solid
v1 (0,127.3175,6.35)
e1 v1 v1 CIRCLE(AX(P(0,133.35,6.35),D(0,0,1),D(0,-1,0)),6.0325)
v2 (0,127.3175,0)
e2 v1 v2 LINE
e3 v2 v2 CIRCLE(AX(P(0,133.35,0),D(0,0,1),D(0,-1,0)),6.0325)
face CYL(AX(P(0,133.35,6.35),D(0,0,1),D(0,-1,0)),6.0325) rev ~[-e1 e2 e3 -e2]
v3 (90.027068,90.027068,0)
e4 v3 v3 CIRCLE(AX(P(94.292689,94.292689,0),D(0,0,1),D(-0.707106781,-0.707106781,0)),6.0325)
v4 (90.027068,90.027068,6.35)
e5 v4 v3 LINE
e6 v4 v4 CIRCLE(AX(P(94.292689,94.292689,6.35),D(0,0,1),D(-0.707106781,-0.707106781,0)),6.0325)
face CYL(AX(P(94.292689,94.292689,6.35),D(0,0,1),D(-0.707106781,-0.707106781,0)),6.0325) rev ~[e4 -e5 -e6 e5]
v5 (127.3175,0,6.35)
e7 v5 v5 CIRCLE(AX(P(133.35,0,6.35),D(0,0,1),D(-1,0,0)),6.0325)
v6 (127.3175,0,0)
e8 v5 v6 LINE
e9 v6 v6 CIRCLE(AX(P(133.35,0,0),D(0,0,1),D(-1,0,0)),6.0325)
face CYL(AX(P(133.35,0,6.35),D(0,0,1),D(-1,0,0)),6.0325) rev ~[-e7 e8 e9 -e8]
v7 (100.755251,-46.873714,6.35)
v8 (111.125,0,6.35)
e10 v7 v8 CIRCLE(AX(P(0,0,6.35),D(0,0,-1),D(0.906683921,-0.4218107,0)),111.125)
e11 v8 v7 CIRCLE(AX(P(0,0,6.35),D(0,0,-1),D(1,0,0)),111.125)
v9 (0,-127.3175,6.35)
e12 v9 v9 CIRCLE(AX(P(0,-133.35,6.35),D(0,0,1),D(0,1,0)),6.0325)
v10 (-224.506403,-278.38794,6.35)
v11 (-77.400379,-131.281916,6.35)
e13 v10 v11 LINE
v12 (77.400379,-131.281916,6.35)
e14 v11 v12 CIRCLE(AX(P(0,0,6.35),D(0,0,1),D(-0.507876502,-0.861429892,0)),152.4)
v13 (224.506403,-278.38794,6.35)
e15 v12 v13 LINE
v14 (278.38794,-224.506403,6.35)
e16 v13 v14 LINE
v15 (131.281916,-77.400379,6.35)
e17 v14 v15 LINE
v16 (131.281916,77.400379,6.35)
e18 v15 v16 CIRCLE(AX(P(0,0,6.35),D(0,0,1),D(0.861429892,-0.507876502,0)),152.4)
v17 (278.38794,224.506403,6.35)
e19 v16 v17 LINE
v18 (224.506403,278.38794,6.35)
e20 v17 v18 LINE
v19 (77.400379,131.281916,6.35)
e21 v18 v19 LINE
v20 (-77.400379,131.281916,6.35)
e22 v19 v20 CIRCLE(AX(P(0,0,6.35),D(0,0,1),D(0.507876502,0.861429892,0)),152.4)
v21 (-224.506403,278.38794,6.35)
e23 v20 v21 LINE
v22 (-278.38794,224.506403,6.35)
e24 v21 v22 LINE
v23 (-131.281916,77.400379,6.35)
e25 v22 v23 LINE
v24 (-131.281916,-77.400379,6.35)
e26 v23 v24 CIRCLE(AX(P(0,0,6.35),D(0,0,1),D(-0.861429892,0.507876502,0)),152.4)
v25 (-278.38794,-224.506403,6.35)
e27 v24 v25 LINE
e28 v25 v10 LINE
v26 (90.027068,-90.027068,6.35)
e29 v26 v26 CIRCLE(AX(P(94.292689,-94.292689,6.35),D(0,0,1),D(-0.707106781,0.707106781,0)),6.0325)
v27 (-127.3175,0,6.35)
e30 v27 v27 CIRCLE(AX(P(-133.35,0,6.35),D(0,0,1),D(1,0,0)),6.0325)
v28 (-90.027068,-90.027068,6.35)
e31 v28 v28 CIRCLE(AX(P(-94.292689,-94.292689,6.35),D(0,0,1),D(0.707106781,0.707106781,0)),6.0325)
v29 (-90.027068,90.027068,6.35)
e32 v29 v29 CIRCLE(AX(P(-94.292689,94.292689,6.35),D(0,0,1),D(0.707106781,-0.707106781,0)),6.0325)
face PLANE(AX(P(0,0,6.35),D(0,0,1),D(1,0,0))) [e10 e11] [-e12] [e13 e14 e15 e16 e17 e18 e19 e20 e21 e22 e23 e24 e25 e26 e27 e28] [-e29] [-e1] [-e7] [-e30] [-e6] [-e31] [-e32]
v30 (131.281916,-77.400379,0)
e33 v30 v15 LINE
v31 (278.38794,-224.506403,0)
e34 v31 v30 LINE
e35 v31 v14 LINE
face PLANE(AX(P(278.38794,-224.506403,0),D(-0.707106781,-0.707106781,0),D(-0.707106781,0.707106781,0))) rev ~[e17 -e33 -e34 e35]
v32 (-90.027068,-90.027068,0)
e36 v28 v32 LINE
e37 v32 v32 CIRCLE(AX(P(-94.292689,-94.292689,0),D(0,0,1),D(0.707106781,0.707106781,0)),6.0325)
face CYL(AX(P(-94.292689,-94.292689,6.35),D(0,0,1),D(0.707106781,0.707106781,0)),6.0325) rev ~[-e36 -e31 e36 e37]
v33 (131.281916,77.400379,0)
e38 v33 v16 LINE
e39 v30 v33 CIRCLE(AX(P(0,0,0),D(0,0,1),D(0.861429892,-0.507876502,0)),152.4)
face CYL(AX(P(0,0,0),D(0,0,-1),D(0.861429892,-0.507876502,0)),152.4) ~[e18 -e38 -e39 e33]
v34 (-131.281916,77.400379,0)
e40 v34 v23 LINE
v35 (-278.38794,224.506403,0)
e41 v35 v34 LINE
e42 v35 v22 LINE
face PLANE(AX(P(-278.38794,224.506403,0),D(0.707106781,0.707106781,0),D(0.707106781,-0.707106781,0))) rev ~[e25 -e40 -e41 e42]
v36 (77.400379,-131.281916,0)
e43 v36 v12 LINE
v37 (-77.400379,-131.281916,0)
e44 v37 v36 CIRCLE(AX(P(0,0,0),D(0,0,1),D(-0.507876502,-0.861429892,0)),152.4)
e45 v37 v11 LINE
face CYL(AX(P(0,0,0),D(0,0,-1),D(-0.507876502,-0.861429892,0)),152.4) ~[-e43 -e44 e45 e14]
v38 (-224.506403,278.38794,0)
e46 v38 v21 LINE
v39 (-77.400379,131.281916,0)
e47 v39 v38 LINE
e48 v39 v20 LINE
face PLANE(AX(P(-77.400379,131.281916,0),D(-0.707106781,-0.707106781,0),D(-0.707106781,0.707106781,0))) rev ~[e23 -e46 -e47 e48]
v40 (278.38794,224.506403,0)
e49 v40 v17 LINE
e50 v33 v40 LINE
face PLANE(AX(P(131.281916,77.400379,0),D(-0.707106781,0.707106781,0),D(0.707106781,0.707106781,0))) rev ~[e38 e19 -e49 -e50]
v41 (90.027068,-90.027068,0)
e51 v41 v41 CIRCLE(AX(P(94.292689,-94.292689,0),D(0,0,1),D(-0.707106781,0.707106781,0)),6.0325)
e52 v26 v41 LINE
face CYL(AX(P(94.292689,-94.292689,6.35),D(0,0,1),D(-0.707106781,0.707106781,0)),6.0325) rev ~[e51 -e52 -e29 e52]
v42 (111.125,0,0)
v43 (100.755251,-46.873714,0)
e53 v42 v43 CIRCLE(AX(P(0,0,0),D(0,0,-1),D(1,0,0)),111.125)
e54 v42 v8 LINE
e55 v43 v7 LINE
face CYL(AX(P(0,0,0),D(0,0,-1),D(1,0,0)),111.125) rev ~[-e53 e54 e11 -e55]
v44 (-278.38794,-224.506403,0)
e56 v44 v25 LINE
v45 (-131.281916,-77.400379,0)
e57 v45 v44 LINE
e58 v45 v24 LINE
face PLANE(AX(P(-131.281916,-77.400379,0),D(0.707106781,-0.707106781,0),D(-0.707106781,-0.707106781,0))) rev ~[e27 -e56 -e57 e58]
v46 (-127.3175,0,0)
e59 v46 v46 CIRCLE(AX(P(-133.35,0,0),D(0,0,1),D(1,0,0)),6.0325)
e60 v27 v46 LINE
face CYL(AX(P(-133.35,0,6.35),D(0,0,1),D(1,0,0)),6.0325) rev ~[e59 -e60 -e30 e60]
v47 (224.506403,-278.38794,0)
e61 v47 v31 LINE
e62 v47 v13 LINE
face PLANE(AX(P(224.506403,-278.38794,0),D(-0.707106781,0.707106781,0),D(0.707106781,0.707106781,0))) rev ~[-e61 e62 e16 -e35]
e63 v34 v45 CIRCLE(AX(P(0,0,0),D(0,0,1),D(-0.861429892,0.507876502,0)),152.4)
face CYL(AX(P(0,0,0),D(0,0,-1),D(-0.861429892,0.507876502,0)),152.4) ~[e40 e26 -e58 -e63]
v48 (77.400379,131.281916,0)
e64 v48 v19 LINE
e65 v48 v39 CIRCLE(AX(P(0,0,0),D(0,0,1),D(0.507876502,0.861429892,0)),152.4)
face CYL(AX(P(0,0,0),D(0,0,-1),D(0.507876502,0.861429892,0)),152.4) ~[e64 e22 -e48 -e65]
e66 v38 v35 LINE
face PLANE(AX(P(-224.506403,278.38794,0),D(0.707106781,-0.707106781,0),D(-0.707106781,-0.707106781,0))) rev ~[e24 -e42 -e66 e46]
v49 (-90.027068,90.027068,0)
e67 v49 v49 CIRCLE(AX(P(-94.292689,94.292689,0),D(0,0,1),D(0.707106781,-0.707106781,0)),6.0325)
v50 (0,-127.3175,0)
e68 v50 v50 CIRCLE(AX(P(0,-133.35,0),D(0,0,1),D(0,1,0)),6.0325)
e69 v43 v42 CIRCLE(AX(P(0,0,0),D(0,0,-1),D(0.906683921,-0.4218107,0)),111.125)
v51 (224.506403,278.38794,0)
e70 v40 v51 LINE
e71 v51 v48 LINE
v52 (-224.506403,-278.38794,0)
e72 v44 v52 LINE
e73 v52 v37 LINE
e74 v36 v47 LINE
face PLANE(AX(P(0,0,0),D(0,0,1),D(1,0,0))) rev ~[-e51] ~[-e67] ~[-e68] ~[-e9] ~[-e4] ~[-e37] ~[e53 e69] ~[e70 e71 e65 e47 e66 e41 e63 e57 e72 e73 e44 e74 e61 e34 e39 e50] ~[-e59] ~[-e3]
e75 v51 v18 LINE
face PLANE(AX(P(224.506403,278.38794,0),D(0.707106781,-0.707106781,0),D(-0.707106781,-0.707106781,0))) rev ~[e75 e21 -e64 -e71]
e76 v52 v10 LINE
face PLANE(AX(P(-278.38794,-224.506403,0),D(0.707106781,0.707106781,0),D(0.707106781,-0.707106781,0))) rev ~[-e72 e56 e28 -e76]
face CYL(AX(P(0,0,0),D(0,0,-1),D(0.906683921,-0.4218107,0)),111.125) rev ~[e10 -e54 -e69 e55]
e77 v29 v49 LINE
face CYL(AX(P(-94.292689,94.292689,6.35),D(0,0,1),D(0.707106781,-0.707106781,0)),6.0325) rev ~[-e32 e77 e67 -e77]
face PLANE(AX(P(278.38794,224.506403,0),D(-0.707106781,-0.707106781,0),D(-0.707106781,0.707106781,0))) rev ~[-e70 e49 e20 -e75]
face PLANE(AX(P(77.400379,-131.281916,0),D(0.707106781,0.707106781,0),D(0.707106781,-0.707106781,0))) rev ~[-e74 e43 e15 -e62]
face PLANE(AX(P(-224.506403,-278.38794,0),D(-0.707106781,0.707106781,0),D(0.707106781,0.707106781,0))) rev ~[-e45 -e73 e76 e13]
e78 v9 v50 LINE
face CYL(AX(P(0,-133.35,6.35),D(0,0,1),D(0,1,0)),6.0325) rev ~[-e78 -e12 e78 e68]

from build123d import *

# Parameters (mm, degrees)
F1_DEPTH        = 6.35
F2_R            = 6.0325
F3_DEPTH        = 25.4
F3_COPIES_COUNT = 8


# Not quite as in the source:
# - a pattern or mirror of a feature is missing from the dataset's text; its kind, count and spacing are read off the source's solid


with BuildPart() as f1:
    # F0 (on Top) → F1 (new body)
    with BuildSketch(Plane.XY):
        with BuildLine():
            Line((-278.3879397531, 224.5064030267), (-131.2819155679, 77.4003788415))
            ThreePointArc((-131.2819155679, 77.4003788415), (-152.4, 0), (-131.2819155679, -77.4003788415))
            Line((-131.2819155679, -77.4003788415), (-278.3879397531, -224.5064030267))
            Line((-278.3879397531, -224.5064030267), (-224.5064030267, -278.3879397531))
            Line((-224.5064030267, -278.3879397531), (-77.4003788415, -131.2819155679))
            ThreePointArc((-77.4003788415, -131.2819155679), (0, -152.4), (77.4003788415, -131.2819155679))
            Line((77.4003788415, -131.2819155679), (224.5064030267, -278.3879397531))
            Line((224.5064030267, -278.3879397531), (278.3879397531, -224.5064030267))
            Line((278.3879397531, -224.5064030267), (131.2819155679, -77.4003788415))
            ThreePointArc((131.2819155679, -77.4003788415), (152.4, 0), (131.2819155679, 77.4003788415))
            Line((131.2819155679, 77.4003788415), (278.3879397531, 224.5064030267))
            Line((278.3879397531, 224.5064030267), (224.5064030267, 278.3879397531))
            Line((224.5064030267, 278.3879397531), (77.4003788415, 131.2819155679))
            ThreePointArc((77.4003788415, 131.2819155679), (0, 152.4), (-77.4003788415, 131.2819155679))
            Line((-77.4003788415, 131.2819155679), (-224.5064030267, 278.3879397531))
            Line((-224.5064030267, 278.3879397531), (-278.3879397531, 224.5064030267))
        make_face()
        with BuildLine():
            ThreePointArc((100.7552507667, -46.8737140403), (-108.5015964547, 24.0035245698), (111.125, 0))
            ThreePointArc((111.125, 0), (108.5015964547, -24.0035245698), (100.7552507667, -46.8737140403))
        make_face(mode=Mode.SUBTRACT)
    extrude(amount=F1_DEPTH)

    # F2 (on face) → F3 (cut)
    with BuildSketch(Plane.XY.offset(6.35)):
        with Locations((-133.35, 0)):
            Circle(F2_R)
    f3 = extrude(amount=-F3_DEPTH, mode=Mode.SUBTRACT)

    # F3_copies: F3 ×8 about axis
    f3_copies_axis = Axis((0, 0, 0), (0, 0, 1))
    for i in range(1, F3_COPIES_COUNT):
        add(f3.rotate(f3_copies_axis, i * 360 / F3_COPIES_COUNT), mode=Mode.SUBTRACT)


solid = f1.part
